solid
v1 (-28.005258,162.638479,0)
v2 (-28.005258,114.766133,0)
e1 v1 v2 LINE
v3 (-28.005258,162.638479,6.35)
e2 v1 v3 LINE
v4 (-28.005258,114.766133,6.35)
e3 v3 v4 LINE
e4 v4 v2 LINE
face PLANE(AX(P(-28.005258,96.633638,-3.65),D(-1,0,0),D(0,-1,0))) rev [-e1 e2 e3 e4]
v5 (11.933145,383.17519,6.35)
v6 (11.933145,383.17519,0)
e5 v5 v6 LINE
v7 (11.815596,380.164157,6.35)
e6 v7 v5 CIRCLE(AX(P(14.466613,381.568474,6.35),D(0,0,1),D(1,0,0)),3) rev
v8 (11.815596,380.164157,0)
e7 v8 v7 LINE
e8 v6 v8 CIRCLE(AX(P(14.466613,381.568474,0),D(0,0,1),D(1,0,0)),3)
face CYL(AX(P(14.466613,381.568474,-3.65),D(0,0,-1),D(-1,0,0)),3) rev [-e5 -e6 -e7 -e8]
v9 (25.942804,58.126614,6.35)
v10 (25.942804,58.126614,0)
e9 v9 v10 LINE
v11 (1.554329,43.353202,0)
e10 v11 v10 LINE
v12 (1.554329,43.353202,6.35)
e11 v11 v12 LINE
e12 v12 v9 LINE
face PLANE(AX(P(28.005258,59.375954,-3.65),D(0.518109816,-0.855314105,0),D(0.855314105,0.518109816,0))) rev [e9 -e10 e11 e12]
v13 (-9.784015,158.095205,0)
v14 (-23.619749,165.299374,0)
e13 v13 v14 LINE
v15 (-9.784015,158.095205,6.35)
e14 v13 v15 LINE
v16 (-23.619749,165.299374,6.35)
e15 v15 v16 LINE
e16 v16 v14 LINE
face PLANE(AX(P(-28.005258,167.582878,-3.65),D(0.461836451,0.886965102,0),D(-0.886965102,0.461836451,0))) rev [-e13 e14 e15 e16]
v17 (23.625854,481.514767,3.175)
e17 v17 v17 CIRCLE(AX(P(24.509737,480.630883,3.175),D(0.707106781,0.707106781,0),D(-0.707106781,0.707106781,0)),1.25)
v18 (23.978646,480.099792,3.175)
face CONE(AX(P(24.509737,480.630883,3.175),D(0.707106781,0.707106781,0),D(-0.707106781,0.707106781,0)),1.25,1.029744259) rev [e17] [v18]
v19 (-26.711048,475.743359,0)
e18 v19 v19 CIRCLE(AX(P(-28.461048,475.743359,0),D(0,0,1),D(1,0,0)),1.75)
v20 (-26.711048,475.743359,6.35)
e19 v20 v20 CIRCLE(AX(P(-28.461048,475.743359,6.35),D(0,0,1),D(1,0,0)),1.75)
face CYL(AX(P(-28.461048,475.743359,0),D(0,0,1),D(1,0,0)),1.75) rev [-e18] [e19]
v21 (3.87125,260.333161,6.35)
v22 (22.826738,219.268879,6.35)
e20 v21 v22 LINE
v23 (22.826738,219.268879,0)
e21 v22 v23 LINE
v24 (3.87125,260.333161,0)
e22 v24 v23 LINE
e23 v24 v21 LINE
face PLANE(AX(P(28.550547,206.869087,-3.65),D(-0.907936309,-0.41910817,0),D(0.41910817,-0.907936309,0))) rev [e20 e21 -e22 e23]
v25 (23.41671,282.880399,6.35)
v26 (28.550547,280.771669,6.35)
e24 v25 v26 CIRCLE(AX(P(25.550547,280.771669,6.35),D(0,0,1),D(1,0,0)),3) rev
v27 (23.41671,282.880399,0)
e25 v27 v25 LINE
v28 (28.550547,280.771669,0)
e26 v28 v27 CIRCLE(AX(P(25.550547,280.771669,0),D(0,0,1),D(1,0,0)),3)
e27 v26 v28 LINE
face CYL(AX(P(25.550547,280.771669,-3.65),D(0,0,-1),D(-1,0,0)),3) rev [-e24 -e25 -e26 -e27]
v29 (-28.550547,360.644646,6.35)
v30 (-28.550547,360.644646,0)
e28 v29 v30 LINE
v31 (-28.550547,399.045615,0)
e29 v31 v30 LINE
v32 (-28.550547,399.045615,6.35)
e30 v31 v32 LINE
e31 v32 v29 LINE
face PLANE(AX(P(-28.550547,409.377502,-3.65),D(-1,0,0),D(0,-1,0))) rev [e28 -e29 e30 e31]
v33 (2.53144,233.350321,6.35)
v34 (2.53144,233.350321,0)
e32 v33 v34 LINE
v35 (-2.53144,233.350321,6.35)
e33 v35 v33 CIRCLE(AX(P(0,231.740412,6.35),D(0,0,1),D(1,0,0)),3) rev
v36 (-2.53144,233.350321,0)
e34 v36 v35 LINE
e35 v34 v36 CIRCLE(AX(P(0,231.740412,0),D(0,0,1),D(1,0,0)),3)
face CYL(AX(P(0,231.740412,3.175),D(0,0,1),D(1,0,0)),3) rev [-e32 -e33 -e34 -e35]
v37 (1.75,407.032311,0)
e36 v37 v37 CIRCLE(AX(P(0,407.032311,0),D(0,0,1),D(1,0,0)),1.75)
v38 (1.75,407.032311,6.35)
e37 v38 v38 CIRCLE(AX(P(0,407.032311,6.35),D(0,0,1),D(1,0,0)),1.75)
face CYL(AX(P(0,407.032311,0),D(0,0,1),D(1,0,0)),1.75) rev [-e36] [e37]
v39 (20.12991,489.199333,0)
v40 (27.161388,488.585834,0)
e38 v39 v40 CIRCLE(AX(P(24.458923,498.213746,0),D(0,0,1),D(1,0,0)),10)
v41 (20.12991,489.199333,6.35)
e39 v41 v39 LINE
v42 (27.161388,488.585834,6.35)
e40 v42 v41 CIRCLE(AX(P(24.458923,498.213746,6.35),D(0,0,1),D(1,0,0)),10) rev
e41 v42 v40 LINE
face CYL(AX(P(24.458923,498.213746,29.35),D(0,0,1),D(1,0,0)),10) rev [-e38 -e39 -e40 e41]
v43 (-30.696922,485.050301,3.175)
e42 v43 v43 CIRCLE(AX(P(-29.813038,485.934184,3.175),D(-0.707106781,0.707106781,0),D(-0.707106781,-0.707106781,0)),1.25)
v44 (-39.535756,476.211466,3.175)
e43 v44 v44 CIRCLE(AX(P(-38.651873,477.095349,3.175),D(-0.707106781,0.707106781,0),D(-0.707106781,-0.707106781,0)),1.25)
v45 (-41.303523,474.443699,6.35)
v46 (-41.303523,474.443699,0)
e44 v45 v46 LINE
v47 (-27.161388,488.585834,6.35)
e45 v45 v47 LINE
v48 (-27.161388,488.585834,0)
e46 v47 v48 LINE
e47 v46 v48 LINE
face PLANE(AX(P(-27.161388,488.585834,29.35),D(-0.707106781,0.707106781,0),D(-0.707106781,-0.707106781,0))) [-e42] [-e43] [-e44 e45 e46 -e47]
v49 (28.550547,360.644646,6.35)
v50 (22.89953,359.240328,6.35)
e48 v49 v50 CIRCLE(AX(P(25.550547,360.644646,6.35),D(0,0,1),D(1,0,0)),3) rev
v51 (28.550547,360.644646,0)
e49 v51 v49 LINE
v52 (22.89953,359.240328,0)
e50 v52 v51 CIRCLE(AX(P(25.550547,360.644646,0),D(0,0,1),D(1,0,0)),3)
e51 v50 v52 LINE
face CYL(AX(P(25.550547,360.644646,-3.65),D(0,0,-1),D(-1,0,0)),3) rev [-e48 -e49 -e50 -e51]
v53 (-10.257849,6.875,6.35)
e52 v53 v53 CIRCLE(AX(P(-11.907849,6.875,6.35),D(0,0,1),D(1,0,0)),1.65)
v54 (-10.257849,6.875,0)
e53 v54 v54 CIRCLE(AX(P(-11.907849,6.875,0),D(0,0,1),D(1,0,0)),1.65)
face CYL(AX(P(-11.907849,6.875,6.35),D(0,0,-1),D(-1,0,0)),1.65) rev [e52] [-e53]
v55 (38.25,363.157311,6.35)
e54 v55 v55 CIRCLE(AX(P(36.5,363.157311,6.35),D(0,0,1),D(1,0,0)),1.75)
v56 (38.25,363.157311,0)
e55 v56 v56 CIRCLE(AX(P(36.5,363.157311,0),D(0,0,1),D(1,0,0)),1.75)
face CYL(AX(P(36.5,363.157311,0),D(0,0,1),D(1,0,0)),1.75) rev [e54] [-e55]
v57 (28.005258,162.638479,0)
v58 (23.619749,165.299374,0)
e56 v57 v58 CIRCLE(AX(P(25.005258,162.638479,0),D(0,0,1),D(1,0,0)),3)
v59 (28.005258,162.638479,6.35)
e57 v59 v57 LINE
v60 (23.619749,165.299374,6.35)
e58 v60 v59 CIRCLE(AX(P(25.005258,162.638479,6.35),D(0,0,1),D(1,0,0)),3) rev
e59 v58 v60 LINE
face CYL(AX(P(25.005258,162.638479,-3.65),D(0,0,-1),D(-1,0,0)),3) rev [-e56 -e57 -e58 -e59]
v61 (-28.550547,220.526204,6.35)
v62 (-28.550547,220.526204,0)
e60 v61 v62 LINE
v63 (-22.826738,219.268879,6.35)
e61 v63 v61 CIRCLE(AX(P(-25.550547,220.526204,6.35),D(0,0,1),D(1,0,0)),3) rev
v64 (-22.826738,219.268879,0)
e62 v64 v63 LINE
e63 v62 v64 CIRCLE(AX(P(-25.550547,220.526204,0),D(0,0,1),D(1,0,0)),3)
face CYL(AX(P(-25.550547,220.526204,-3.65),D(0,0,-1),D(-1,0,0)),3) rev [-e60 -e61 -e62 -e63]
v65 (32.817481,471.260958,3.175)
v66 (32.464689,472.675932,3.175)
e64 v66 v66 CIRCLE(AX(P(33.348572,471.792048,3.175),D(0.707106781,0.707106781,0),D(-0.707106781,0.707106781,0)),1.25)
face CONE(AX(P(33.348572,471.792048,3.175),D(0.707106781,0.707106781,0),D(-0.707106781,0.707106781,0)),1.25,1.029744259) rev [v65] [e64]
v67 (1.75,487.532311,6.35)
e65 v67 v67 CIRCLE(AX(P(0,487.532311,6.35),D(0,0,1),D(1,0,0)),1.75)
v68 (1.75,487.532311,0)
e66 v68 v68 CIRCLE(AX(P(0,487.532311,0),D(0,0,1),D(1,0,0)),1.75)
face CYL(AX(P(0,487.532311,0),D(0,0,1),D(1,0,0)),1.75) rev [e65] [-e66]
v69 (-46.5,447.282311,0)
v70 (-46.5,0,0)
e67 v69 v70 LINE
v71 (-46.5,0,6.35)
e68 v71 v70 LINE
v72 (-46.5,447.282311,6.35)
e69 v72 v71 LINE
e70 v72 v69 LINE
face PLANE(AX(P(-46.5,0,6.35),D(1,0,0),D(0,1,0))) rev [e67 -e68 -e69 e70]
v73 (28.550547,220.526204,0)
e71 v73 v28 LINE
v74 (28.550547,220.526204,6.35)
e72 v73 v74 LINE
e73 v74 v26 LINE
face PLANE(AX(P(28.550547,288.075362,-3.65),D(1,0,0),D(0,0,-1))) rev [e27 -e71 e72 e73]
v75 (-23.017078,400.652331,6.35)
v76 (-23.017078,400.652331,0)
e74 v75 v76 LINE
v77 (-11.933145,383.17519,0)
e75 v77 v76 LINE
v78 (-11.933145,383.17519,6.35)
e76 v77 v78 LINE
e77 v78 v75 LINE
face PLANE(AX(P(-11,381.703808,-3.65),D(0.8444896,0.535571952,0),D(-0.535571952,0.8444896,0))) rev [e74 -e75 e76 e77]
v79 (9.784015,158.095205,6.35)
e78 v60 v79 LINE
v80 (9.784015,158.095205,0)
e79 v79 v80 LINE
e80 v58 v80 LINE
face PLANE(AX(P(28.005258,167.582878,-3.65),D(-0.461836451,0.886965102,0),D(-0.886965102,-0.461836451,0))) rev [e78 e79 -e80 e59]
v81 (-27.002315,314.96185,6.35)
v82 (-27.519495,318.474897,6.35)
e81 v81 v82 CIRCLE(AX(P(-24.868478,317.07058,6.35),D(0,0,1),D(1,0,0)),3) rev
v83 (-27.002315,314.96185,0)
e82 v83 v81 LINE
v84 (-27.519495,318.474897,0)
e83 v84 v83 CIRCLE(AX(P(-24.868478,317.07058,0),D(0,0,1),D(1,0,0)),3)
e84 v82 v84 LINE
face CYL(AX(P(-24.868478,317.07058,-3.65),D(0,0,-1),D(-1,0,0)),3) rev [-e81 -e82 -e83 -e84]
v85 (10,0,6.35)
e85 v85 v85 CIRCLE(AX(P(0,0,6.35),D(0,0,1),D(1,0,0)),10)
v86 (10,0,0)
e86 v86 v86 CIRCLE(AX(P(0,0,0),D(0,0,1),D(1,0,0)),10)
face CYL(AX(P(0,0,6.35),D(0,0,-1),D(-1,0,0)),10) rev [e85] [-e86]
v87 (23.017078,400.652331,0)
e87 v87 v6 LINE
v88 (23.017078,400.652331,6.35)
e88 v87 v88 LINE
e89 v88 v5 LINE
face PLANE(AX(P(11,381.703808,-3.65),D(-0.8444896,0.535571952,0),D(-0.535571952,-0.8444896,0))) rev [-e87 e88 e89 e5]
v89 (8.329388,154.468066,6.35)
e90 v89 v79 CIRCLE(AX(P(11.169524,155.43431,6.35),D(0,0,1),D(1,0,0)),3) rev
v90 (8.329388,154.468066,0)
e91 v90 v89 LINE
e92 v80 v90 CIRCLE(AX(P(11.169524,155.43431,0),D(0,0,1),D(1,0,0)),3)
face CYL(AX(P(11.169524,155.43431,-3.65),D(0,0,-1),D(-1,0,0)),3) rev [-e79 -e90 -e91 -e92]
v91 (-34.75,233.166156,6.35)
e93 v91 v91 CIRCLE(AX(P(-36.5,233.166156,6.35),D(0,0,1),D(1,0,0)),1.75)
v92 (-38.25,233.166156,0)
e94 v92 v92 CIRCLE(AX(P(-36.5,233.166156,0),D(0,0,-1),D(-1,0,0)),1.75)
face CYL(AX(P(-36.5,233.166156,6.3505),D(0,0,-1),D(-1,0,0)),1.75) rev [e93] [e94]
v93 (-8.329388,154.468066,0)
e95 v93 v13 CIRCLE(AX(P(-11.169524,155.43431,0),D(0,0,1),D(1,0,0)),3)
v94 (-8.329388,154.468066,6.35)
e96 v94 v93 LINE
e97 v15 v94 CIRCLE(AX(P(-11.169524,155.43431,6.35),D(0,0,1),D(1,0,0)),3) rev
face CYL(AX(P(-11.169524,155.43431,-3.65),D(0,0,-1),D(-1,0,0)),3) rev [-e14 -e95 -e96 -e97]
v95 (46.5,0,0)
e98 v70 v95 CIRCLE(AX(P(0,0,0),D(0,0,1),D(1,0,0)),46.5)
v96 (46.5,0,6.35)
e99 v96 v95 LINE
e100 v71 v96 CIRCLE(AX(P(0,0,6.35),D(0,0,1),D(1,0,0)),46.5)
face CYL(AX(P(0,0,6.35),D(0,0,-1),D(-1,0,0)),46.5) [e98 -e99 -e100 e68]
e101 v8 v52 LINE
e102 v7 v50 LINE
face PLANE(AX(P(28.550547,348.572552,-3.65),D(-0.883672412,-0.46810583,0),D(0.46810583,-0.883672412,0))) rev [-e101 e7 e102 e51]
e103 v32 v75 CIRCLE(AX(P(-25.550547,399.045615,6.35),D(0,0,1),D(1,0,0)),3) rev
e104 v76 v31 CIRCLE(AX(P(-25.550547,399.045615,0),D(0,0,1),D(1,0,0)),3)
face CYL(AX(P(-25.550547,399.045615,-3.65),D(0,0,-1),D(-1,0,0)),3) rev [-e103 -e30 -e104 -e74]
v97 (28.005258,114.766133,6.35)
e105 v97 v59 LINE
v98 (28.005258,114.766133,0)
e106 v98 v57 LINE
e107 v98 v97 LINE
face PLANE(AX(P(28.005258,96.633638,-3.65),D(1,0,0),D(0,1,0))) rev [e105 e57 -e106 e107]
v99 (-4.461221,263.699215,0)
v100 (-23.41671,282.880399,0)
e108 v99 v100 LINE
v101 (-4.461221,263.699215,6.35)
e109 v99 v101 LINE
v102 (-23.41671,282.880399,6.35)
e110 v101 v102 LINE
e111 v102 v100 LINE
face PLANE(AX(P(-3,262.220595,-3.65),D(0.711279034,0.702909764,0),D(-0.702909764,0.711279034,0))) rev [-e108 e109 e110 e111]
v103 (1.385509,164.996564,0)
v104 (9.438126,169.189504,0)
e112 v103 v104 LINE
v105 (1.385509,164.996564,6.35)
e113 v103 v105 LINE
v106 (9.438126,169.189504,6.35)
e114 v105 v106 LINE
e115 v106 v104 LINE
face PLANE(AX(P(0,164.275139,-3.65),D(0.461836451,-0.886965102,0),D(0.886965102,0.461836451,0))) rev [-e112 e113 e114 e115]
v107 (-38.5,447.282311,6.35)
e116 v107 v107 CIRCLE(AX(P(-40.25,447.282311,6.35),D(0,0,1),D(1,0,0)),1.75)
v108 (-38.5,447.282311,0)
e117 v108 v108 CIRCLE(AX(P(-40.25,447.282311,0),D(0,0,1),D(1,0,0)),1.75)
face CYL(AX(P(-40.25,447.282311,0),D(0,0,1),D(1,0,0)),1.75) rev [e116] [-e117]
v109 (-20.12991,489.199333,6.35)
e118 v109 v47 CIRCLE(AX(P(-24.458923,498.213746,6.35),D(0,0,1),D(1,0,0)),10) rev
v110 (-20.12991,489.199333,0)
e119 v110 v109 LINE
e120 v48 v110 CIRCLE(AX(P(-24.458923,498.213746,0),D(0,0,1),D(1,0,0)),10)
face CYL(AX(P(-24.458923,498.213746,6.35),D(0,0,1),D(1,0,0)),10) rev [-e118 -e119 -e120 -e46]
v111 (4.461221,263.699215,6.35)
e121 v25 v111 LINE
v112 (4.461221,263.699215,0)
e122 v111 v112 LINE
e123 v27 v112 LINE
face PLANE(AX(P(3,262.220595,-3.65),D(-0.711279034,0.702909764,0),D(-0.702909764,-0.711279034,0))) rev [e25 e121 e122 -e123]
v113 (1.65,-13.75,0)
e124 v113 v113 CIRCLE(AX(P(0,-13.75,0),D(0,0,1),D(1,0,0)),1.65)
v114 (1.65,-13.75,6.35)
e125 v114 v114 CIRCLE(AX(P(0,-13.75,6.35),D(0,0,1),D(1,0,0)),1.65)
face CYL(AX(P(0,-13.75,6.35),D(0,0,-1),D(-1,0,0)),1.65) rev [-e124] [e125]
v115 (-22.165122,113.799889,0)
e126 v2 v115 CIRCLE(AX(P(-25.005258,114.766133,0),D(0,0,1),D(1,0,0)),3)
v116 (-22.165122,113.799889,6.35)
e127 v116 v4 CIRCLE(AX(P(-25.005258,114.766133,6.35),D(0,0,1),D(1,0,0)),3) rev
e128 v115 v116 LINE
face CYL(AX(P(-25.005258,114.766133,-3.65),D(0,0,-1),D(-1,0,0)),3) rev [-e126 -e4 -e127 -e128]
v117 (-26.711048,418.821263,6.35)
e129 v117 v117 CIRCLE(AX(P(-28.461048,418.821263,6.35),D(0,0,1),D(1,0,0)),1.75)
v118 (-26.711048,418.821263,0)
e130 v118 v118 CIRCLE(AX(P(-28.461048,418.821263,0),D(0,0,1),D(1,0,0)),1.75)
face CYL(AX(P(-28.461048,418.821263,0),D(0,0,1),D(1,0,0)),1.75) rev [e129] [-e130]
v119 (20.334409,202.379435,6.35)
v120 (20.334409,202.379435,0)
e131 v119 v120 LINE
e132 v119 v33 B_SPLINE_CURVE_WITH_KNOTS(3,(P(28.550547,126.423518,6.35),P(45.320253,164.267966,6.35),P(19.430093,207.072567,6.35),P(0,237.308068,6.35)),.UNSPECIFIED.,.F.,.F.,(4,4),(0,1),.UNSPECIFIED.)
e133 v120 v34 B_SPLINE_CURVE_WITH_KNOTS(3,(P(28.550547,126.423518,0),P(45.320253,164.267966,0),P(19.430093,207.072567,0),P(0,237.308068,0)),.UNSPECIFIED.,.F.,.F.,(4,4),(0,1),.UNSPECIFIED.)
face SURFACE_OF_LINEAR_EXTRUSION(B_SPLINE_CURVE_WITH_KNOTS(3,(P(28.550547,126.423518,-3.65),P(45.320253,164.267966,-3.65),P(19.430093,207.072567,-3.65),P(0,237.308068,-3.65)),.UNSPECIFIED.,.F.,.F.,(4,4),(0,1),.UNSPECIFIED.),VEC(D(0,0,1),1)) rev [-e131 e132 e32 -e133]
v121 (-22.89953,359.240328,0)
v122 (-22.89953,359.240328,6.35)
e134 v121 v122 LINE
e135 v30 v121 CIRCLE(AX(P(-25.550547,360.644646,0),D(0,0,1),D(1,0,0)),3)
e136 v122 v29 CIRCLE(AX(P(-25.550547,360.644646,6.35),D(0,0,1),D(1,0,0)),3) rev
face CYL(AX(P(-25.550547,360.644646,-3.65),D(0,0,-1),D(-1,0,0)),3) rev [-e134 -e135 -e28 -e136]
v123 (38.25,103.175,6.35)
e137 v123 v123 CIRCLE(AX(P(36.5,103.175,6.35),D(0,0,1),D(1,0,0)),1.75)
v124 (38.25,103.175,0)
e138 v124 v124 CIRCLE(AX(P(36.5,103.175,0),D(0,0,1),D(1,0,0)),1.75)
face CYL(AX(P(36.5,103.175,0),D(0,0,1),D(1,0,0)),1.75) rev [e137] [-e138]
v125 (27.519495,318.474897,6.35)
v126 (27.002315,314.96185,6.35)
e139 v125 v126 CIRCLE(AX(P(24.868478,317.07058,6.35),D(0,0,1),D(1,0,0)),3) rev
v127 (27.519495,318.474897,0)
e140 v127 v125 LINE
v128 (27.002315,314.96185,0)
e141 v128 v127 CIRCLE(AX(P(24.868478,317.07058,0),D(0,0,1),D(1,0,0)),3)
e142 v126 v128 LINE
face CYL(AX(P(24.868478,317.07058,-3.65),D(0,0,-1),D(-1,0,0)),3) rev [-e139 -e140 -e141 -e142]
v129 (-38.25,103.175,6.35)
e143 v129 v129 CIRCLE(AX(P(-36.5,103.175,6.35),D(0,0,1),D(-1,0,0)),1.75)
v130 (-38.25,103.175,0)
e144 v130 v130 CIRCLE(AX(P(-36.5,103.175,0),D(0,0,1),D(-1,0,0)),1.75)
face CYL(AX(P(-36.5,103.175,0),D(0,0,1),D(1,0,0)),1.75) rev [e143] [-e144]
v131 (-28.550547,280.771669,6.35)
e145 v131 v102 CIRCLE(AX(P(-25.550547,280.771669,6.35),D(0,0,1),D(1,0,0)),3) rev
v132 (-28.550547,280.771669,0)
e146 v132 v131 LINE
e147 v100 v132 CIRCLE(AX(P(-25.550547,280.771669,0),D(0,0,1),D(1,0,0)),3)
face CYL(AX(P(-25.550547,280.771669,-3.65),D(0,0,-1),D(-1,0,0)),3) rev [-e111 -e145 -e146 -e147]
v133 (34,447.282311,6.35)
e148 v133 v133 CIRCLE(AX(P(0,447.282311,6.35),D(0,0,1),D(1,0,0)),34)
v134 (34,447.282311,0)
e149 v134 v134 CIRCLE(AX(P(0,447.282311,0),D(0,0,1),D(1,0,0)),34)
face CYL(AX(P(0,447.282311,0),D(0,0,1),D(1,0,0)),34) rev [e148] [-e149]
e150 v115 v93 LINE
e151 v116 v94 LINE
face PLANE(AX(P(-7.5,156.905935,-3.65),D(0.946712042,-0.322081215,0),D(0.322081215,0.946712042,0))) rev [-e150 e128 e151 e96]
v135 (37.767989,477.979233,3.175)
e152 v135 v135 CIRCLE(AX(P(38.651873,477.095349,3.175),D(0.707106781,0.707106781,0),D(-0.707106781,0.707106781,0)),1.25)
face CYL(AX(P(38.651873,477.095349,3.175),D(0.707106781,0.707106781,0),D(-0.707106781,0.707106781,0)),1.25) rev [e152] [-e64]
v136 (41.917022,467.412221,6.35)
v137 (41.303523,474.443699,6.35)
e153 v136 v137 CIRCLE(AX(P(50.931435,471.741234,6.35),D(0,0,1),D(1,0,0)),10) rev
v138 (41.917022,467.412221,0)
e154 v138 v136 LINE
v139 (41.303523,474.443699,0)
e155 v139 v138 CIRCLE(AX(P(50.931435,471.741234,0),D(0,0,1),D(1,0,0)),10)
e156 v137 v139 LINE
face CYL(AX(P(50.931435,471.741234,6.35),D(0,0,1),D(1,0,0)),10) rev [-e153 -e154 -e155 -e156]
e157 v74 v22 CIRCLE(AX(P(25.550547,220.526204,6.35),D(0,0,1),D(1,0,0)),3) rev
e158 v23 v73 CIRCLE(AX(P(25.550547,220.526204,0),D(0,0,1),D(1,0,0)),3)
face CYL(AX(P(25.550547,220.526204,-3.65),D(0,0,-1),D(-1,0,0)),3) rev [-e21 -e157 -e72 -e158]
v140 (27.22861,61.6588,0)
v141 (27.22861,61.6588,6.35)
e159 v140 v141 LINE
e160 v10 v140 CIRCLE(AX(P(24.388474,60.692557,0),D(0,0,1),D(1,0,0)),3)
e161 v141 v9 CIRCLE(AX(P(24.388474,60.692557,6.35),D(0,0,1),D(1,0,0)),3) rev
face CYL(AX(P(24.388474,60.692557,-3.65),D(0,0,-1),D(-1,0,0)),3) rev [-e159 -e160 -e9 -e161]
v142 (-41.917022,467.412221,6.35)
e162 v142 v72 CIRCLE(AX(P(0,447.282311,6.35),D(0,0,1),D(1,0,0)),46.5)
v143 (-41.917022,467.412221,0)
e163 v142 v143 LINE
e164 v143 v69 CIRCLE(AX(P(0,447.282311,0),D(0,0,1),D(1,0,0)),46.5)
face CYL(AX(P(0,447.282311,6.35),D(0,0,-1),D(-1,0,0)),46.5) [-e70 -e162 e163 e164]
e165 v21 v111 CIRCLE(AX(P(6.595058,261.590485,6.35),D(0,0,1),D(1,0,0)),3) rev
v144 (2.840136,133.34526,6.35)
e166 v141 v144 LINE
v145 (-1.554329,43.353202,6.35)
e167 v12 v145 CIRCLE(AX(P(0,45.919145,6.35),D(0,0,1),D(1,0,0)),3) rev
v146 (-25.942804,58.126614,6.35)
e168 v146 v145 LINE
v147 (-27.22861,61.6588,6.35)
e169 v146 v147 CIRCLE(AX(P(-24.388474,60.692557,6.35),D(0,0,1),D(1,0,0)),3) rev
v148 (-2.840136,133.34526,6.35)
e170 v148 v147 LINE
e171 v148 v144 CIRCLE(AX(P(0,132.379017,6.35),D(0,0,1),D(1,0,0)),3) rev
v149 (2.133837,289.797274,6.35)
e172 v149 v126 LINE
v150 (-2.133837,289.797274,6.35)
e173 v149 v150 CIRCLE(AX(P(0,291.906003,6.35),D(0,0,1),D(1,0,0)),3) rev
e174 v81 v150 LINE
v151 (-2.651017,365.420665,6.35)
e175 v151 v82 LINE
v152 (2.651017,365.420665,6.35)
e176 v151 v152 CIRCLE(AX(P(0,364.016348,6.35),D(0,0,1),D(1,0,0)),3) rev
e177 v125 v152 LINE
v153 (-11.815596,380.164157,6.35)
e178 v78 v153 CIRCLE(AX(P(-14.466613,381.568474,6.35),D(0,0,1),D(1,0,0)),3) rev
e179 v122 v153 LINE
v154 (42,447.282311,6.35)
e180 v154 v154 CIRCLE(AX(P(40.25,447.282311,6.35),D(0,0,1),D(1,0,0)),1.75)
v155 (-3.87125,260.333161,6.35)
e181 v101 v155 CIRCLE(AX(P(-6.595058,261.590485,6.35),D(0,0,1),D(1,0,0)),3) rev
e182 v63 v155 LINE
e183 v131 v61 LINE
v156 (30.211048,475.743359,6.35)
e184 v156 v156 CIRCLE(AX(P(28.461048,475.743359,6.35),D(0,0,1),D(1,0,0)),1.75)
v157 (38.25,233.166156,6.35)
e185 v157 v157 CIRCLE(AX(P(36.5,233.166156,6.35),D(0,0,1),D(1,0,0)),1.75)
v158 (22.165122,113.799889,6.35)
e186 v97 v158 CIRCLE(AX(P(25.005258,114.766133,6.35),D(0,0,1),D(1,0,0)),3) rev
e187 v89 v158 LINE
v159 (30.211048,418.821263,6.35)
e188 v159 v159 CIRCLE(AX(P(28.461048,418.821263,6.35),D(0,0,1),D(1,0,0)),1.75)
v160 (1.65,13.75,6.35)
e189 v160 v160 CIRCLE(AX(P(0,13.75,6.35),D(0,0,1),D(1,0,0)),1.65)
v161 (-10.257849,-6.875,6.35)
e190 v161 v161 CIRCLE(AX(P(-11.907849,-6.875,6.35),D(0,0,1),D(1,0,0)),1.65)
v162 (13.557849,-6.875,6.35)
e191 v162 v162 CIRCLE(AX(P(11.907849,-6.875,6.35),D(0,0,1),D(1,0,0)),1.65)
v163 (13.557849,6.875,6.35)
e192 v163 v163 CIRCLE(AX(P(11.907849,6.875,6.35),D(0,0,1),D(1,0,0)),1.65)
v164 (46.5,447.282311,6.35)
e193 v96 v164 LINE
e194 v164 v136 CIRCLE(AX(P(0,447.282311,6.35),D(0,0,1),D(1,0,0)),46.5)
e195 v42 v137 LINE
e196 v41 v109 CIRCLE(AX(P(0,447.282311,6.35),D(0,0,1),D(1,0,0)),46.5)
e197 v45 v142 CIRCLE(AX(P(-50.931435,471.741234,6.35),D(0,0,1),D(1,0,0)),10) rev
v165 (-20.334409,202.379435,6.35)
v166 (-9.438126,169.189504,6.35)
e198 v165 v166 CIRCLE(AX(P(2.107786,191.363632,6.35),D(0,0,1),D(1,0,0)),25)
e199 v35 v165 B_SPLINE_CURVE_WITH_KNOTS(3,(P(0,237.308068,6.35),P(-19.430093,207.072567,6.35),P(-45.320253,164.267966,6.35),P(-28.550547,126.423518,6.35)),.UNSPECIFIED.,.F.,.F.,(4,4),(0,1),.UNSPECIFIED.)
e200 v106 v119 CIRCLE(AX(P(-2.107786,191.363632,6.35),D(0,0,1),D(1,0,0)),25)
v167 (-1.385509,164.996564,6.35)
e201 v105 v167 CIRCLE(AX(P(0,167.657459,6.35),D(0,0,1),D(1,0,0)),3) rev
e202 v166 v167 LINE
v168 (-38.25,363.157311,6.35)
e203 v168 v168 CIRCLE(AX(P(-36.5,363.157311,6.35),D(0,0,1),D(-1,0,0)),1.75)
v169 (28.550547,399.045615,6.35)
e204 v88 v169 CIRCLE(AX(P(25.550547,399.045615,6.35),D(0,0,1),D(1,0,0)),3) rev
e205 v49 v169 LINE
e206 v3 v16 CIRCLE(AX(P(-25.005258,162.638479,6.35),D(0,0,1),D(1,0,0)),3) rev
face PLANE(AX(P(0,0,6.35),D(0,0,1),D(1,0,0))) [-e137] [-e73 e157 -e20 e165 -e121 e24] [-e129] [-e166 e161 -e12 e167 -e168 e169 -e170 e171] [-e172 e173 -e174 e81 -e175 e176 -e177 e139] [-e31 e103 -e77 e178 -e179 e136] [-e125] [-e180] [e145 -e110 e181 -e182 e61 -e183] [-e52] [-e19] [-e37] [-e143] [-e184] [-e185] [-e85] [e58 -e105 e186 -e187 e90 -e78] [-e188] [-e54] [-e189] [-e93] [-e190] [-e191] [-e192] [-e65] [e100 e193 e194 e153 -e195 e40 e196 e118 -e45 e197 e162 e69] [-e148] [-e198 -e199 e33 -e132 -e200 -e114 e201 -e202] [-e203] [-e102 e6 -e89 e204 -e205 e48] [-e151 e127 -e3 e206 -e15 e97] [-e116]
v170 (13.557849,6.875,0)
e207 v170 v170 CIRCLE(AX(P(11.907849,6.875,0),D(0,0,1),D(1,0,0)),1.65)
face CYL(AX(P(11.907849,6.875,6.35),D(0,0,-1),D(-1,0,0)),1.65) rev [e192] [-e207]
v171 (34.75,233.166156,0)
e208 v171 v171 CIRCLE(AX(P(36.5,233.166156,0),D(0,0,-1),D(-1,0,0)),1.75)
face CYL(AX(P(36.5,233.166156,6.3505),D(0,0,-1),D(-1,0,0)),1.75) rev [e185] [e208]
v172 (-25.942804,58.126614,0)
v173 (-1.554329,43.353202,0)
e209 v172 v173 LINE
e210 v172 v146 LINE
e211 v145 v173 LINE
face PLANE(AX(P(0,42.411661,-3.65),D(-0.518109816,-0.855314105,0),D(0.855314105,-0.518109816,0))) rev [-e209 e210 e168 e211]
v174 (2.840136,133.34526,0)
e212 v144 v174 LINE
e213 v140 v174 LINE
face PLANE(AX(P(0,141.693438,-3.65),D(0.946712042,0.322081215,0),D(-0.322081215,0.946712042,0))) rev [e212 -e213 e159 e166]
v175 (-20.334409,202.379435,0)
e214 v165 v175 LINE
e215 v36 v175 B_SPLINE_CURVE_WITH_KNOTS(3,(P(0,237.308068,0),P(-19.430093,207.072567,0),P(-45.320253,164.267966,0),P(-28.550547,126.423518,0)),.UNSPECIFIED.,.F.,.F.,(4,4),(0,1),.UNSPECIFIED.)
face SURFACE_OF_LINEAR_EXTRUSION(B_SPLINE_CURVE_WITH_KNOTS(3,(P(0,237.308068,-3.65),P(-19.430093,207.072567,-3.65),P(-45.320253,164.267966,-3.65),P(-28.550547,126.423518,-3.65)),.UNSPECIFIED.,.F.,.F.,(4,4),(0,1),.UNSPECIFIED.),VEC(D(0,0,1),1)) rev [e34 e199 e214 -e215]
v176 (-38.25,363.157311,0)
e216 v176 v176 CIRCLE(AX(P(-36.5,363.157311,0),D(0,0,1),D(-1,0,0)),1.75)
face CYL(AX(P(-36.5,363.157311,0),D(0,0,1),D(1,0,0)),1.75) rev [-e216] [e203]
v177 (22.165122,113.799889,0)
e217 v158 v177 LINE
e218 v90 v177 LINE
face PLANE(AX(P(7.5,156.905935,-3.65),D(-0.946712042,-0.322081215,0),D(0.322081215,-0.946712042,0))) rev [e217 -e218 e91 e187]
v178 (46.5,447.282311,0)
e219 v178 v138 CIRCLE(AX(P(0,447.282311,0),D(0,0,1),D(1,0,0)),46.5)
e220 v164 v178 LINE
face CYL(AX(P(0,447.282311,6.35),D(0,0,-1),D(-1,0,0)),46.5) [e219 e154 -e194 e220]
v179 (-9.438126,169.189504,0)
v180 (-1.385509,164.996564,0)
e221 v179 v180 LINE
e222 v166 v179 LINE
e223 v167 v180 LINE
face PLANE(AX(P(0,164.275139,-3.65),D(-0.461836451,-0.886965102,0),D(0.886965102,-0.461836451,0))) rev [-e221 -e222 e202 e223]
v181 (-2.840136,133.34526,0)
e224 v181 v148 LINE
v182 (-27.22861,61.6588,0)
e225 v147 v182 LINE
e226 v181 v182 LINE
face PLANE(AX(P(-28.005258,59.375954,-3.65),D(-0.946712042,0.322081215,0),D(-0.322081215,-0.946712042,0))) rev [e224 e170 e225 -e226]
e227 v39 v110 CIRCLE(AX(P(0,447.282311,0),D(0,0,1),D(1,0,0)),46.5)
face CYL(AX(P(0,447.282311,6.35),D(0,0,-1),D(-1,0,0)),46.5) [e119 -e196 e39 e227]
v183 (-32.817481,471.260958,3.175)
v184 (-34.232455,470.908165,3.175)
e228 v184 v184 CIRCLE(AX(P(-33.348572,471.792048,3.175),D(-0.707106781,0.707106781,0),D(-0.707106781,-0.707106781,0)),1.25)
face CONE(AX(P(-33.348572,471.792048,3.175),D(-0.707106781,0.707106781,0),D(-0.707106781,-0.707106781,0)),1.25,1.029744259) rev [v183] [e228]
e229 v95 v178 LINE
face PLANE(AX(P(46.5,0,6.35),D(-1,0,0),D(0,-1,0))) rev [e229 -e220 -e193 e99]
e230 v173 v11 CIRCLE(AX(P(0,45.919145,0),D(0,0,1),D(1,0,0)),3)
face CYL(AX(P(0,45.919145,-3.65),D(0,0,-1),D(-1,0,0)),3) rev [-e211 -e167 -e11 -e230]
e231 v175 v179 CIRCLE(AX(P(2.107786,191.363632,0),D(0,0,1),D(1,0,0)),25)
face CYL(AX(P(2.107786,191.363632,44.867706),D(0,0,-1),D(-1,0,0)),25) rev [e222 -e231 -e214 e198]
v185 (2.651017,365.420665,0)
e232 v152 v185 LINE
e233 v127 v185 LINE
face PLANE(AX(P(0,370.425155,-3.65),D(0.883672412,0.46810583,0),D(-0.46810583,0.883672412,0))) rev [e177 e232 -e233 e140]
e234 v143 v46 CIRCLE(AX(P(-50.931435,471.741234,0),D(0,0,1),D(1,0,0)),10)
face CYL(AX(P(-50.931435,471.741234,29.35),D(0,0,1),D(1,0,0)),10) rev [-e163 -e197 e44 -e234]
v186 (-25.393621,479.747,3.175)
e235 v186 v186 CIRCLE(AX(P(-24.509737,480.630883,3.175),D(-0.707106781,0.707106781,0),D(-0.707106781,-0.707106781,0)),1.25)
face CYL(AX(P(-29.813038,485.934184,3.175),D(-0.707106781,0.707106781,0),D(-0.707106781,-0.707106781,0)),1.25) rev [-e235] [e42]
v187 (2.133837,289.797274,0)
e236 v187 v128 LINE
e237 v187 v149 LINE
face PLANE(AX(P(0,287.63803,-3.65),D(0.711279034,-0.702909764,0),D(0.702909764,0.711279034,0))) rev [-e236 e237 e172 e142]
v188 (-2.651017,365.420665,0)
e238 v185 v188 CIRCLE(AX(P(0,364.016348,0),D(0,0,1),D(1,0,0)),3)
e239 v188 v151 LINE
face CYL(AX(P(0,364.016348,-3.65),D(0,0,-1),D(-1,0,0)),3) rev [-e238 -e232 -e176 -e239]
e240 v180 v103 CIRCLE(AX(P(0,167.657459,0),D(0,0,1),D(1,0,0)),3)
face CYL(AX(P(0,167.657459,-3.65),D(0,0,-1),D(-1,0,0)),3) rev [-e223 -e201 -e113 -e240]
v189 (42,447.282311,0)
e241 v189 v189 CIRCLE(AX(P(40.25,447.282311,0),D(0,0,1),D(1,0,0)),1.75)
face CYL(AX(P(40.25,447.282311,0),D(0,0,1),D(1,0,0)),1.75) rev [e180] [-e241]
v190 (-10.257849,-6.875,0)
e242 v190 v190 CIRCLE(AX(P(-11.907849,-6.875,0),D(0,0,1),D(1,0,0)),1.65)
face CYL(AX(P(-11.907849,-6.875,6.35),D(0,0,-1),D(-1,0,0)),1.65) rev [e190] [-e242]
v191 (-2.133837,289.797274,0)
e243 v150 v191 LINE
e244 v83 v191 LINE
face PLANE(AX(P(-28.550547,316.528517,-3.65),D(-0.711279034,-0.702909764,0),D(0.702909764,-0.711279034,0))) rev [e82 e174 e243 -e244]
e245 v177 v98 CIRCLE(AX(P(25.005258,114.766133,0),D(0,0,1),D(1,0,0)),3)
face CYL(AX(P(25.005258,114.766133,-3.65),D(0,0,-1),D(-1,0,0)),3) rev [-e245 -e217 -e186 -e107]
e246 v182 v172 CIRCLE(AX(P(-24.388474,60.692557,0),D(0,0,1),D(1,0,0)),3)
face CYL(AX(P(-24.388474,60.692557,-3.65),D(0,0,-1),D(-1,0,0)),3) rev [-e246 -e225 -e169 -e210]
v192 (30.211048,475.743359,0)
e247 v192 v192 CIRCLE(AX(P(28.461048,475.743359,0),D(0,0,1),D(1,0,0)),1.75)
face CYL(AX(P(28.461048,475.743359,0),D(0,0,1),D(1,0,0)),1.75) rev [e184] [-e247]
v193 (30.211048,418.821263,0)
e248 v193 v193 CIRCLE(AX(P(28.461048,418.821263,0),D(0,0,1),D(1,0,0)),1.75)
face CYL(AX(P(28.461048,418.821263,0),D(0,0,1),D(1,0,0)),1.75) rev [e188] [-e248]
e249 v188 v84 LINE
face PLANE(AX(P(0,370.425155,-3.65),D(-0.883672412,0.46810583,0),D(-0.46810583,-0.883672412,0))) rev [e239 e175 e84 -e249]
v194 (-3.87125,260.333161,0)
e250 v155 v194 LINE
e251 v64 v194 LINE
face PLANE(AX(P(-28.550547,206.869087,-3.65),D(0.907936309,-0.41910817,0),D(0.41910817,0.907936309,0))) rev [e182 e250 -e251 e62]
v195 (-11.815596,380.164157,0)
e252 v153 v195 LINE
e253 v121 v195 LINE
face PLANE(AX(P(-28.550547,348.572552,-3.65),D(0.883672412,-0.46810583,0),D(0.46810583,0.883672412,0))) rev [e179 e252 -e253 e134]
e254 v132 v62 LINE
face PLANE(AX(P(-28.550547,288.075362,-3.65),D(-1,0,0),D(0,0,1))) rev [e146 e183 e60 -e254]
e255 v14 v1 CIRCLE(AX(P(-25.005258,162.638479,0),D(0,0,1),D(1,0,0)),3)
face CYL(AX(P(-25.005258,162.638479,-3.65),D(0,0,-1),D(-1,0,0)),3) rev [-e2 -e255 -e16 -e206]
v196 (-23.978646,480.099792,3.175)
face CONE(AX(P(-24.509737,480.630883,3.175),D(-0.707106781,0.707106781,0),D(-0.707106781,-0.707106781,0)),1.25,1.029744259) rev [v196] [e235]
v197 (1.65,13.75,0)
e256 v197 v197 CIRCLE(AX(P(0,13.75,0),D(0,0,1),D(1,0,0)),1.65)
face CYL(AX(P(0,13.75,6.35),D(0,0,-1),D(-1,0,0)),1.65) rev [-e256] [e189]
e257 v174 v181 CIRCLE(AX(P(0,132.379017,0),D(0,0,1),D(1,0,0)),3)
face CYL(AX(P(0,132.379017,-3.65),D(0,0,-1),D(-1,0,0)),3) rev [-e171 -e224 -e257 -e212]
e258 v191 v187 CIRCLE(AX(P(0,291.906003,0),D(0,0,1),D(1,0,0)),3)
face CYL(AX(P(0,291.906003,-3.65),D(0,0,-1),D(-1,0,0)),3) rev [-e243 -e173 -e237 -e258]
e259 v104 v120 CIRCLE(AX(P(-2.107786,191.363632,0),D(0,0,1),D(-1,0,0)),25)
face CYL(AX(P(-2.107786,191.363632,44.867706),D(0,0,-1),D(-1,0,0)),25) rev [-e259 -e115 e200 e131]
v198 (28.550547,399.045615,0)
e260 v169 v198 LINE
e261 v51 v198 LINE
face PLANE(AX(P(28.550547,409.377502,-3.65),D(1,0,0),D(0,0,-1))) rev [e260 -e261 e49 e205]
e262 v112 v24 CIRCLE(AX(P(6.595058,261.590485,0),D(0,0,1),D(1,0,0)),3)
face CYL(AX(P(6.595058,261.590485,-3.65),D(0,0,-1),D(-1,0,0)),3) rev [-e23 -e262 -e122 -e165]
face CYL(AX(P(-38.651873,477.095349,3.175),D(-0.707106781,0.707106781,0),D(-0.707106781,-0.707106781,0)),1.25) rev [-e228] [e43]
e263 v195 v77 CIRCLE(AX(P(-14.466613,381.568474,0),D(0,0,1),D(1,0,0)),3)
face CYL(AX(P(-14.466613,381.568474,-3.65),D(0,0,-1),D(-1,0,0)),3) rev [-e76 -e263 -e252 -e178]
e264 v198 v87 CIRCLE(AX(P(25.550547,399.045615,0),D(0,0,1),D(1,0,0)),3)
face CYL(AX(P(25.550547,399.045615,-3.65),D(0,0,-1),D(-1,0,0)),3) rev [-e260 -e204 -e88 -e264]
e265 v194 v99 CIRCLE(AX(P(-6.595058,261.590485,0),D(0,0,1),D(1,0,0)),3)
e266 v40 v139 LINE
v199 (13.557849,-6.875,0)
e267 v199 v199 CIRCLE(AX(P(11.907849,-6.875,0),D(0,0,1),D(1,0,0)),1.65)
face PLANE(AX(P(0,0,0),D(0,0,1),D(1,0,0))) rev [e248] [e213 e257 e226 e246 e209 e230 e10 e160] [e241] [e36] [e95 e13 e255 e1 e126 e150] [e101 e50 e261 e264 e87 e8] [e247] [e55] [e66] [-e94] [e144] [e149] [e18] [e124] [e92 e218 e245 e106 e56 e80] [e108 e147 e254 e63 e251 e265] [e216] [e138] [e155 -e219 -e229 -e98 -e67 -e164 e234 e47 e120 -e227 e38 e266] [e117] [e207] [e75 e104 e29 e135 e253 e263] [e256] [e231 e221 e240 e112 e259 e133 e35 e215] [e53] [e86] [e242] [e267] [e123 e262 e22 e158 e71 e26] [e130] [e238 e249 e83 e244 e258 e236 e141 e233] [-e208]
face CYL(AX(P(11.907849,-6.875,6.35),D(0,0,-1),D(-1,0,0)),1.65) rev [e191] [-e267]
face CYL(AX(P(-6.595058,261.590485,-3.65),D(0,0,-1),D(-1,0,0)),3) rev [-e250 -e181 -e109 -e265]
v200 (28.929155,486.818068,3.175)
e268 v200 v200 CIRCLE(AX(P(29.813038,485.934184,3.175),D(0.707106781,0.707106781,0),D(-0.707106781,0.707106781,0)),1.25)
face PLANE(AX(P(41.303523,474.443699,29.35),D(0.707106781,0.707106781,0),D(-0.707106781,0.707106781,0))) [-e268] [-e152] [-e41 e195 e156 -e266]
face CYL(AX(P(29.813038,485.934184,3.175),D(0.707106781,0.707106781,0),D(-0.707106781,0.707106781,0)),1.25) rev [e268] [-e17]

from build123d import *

# Parameters (mm, degrees)
SKETCH2_R                            = 10
SKETCH2_R_2                          = 1.65
BOSS_EXTRUDE1_DEPTH                  = 6.35
CUT_EXTRUDE1_DEPTH                   = 10
FILLET3_R                            = 3
SKETCH5_R                            = 1.75
CUT_EXTRUDE2_DEPTH                   = 549.511460792
SKETCH6_R                            = 26.5
CUT_EXTRUDE3_DEPTH                   = 10
BOSS_EXTRUDE2_START                  = -6.35
BOSS_EXTRUDE2_DEPTH                  = 6.35
TAP_DRILL_FOR_M3X0_5_TAP1_AT_2_COUNT = 2
TAP_DRILL_FOR_M3X0_5_TAP1_AT_2_PITCH = 12
CIRPATTERN2_COUNT                    = 2
CIRPATTERN2_ANGLE                    = 90
CUT_EXTRUDE4_DEPTH                   = 549.511460792
SKETCH11_R                           = 34
CUT_EXTRUDE5_DEPTH                   = 549.511460792
CUT_EXTRUDE6_DEPTH                   = 549.511460792
CUT_EXTRUDE6_DEPTH_BACK              = 549.511460792
SKETCH12_R                           = 1.75
SKETCH13_W                           = 93
SKETCH13_H                           = 53.952458561
CUT_EXTRUDE7_DEPTH                   = 549.511460792
BOSS_EXTRUDE3_REACH                  = 319.131
SKETCH14_W                           = 17.515975695
SKETCH14_H                           = 6.35
BOSS_EXTRUDE4_DEPTH                  = 6.35
SKETCH16_R                           = 1.75
CUT_EXTRUDE8_DEPTH                   = 497.007604239
SKETCH17_R                           = 1.75
BOSS_EXTRUDE5_DEPTH                  = 6.35
BOSS_EXTRUDE6_DEPTH                  = 6.35
M3X0_5_TAPPED_HOLE1_AT_2_COUNT       = 2
M3X0_5_TAPPED_HOLE1_AT_2_PITCH       = 12.5
CIRPATTERN3_COUNT                    = 2
CIRPATTERN3_ANGLE                    = 90
FILLET4_R                            = 10


with BuildPart() as part:
    # Sketch2 → Boss-Extrude1 (new body)
    with BuildSketch(Plane.XY):
        with BuildLine():
            Line((-46.5, 0), (-46.5, 500))
            ThreePointArc((-46.5, 500), (0, 546.5), (46.5, 500))
            Line((46.5, 500), (46.5, 0))
            ThreePointArc((46.5, 0), (0, -46.5), (-46.5, 0))
        make_face()
        Circle(SKETCH2_R, mode=Mode.SUBTRACT)
        with Locations((0, 13.75)):
            Circle(SKETCH2_R_2, mode=Mode.SUBTRACT)
        with Locations((11.907849302, 6.875)):
            Circle(SKETCH2_R_2, mode=Mode.SUBTRACT)
        with Locations((11.907849302, -6.875)):
            Circle(SKETCH2_R_2, mode=Mode.SUBTRACT)
        with Locations((0, -13.75)):
            Circle(SKETCH2_R_2, mode=Mode.SUBTRACT)
        with Locations((-11.907849302, -6.875)):
            Circle(SKETCH2_R_2, mode=Mode.SUBTRACT)
        with Locations((-11.907849302, 6.875)):
            Circle(SKETCH2_R_2, mode=Mode.SUBTRACT)
    extrude(amount=BOSS_EXTRUDE1_DEPTH)

    # Sketch4 → Cut-Extrude1 (cut)
    with BuildSketch(Plane.XY.offset(6.35)):
        Polygon((28.005258112, 59.37595418), (0, 42.411661153), (-28.005258112, 59.37595418), (0, 141.693437584), align=None)
        Polygon((-7.5, 156.905935087), (-28.005258112, 96.633637735), (-28.005258112, 167.582877854), align=None)
        Polygon((28.005258112, 167.582877854), (7.5, 156.905935087), (28.005258112, 96.633637735), align=None)
        with BuildLine():
            Line((0, 164.275138905), (28.550546746, 179.141206521))
            add(Edge.make_bspline(
                [(28.550546746, 179.141206521), (45.32025339, 216.985654627), (19.430092874, 259.790255689), (0, 290.025756679)],
                knots=[0, 0, 0, 0, 1, 1, 1, 1], degree=3))
            add(Edge.make_bspline(
                [(-28.550546746, 179.141206521), (-45.32025339, 216.985654627), (-19.430092874, 259.790255689), (0, 290.025756679)],
                knots=[0, 0, 0, 0, 1, 1, 1, 1], degree=3))
            Line((-28.550546746, 179.141206521), (0, 164.275138905))
        make_face()
        Polygon((28.550546746, 259.58677623), (3, 314.938284003), (28.550546746, 340.793051053), align=None)
        Polygon((-3, 314.938284003), (-28.550546746, 340.793051053), (-28.550546746, 259.58677623), align=None)
        Polygon((0, 423.142843498), (-28.550546746, 369.246205395), (0, 340.355718526), (28.550546746, 369.246205395), align=None)
        Polygon((-28.550546746, 462.095190817), (-28.550546746, 401.290241252), (-11, 434.421497018), align=None)
        Polygon((28.550546746, 401.290241252), (11, 434.421497018), (28.550546746, 462.095190817), align=None)
    extrude(amount=-CUT_EXTRUDE1_DEPTH, mode=Mode.SUBTRACT)

    # Fillet3
    fillet3_edges = [part.edges().sort_by_distance(p)[0] for p in [
        (-11, 434.421497018, 3.175),
        (-28.550546746, 401.290241252, 3.175),
        (28.550546746, 401.290241252, 3.175),
        (11, 434.421497018, 3.175),
        (28.550546746, 462.095190817, 3.175),
        (-28.550546746, 462.095190817, 3.175),
        (0, 423.142843498, 3.175),
        (-28.550546746, 369.246205395, 3.175),
        (28.550546746, 369.246205395, 3.175),
        (0, 340.355718526, 3.175),
        (28.550546746, 340.793051053, 3.175),
        (-28.550546746, 340.793051053, 3.175),
        (-3, 314.938284003, 3.175),
        (3, 314.938284003, 3.175),
        (28.550546746, 259.58677623, 3.175),
        (-28.550546746, 259.58677623, 3.175),
        (28.550546746, 179.141206521, 3.175),
        (0, 290.025756679, 3.175),
        (-28.550546746, 179.141206521, 3.175),
        (0, 164.275138905, 3.175),
        (-28.005258112, 96.633637735, 3.175),
        (28.005258112, 96.633637735, 3.175),
        (7.5, 156.905935087, 3.175),
        (-28.005258112, 167.582877854, 3.175),
        (28.005258112, 167.582877854, 3.175),
        (0, 141.693437584, 3.175),
        (28.005258112, 59.37595418, 3.175),
        (-28.005258112, 59.37595418, 3.175),
        (0, 42.411661153, 3.175),
        (-7.5, 156.905935087, 3.175),
    ]]
    fillet(fillet3_edges, radius=FILLET3_R)

    # Sketch5 → Cut-Extrude2 (cut, through all)
    with BuildSketch(Plane.XY.offset(6.35)):
        with Locations((36.5, 103.175)):
            Circle(SKETCH5_R)
        with Locations(Location((-36.5, 103.175, 0), (0, 0, 180))):
            Circle(SKETCH5_R)
        with Locations(Location((36.5, 259.525, 0), (0, 0, 180))):
            Circle(SKETCH5_R)
        with Locations((-36.5, 259.525)):
            Circle(SKETCH5_R)
        with Locations((36.5, 415.875)):
            Circle(SKETCH5_R)
        with Locations(Location((-36.5, 415.875, 0), (0, 0, 180))):
            Circle(SKETCH5_R)
    extrude(amount=-CUT_EXTRUDE2_DEPTH, mode=Mode.SUBTRACT)

    # Sketch6 → Cut-Extrude3 (cut)
    with BuildSketch(Plane.XY.offset(6.35)):
        with Locations((0, 500)):
            Circle(SKETCH6_R)
    extrude(amount=-CUT_EXTRUDE3_DEPTH, mode=Mode.SUBTRACT)

    # Sketch7 → Boss-Extrude2 (add)
    with BuildSketch(Plane.XY.offset(6.35).offset(BOSS_EXTRUDE2_START)):
        with BuildLine():
            Line((44.110383395, 529.968247771), (29.968247771, 544.110383395))
            ThreePointArc((29.968247771, 544.110383395), (23.286397782, 542.399293624), (16.474718596, 543.483717035))
            ThreePointArc((16.474718596, 543.483717035), (32.880465325, 532.880465325), (43.483717035, 516.474718596))
            ThreePointArc((43.483717035, 516.474718596), (42.399293624, 523.286397782), (44.110383395, 529.968247771))
        make_face()
    boss_extrude2 = extrude(amount=BOSS_EXTRUDE2_DEPTH)

    # Sketch9 → Tap Drill for M3x0.5 Tap1 (revolve, cut)
    with BuildSketch(Plane(origin=(32.796674896, 541.28195627, 3.175), x_dir=(-0.7071067811865481, 0.7071067811865469, 0), z_dir=(0, 0, 1))):
        Polygon((0, 0), (0, 5.751075774), (1.25, 5), (1.25, 0), align=None)
    tap_drill_for_m3x0_5_tap1 = revolve(axis=Axis((37.286802956, 545.772084331, 3.175), (-0.7071067811865468, -0.7071067811865482, 0)), mode=Mode.SUBTRACT)

    # Tap Drill for M3x0.5 Tap1 at 2: Tap Drill for M3x0.5 Tap1 ×2
    with Locations(*[Vector(0.7071067811865482, -0.7071067811865468, 0) * (i * TAP_DRILL_FOR_M3X0_5_TAP1_AT_2_PITCH) for i in range(1, TAP_DRILL_FOR_M3X0_5_TAP1_AT_2_COUNT)]):
        add(tap_drill_for_m3x0_5_tap1, mode=Mode.SUBTRACT)

    # CirPattern2: Boss-Extrude2, Tap Drill for M3x0.5 Tap1 ×2 about axis
    cirpattern2_axis = Axis((0, 500, 0), (0, 0, 1))
    add([boss_extrude2.rotate(cirpattern2_axis, i * CIRPATTERN2_ANGLE / (CIRPATTERN2_COUNT - 1)) for i in range(1, CIRPATTERN2_COUNT)])
    add([tap_drill_for_m3x0_5_tap1.rotate(cirpattern2_axis, i * CIRPATTERN2_ANGLE / (CIRPATTERN2_COUNT - 1)) for i in range(1, CIRPATTERN2_COUNT)], mode=Mode.SUBTRACT)

    # CirPattern2 copy 1 sketch → CirPattern2 copy 1 (revolve, cut)
    with BuildSketch(Plane(origin=(-32.796674896, 541.28195627, 3.175), x_dir=(-0.7071067811865445, -0.7071067811865506, 0), z_dir=(0, 0, 1))):
        Polygon((0, 0), (0, 5.751075774), (1.25, 5), (1.25, 0), align=None)
    revolve(axis=Axis((-37.286802956, 545.772084331, 3.175), (0.7071067811865507, -0.7071067811865444, 0)), mode=Mode.SUBTRACT)

    # Sketch10 → Cut-Extrude4 (cut, through all)
    with BuildSketch(Plane.XY.offset(6.35)):
        with BuildLine():
            Line((-43.483717035, 516.474718596), (-63.483717035, 516.474718596))
            ThreePointArc((-63.483717035, 516.474718596), (0, 565.586573942), (63.483717035, 516.474718596))
            Line((63.483717035, 516.474718596), (43.483717035, 516.474718596))
            ThreePointArc((43.483717035, 516.474718596), (0, 546.5), (-43.483717035, 516.474718596))
        make_face()
    extrude(amount=-CUT_EXTRUDE4_DEPTH, mode=Mode.SUBTRACT)

    # Sketch11 → Cut-Extrude5 (cut, through all)
    with BuildSketch(Plane.XY.offset(6.35)):
        with Locations((0, 500)):
            Circle(SKETCH11_R)
    extrude(amount=-CUT_EXTRUDE5_DEPTH, mode=Mode.SUBTRACT)

    # Sketch12 → Cut-Extrude6 (cut, two sides: drawn at the far end of the back side and taken through both)
    with BuildSketch(Plane.XY.offset(6.35).offset(-CUT_EXTRUDE6_DEPTH_BACK)):
        with Locations((0, 540.25)):
            Circle(SKETCH12_R)
        with Locations((28.461047943, 528.461047943)):
            Circle(SKETCH12_R)
        with Locations((40.25, 500)):
            Circle(SKETCH12_R)
        with Locations((28.461047943, 471.538952057)):
            Circle(SKETCH12_R)
        with Locations((0, 459.75)):
            Circle(SKETCH12_R)
        with Locations((-28.461047943, 471.538952057)):
            Circle(SKETCH12_R)
        with Locations((-40.25, 500)):
            Circle(SKETCH12_R)
        with Locations((-28.461047943, 528.461047943)):
            Circle(SKETCH12_R)
    extrude(amount=CUT_EXTRUDE6_DEPTH + CUT_EXTRUDE6_DEPTH_BACK, mode=Mode.SUBTRACT)

    # Sketch13 → Cut-Extrude7 (cut, through all)
    with BuildSketch(Plane(origin=(0, 0, 0), x_dir=(-1, 0, 0), z_dir=(0, 0, -1))):
        with Locations((0, 207.119171895)):
            Rectangle(SKETCH13_W, SKETCH13_H)
    extrude(amount=-CUT_EXTRUDE7_DEPTH, mode=Mode.SUBTRACT)


with BuildPart() as cut_extrude7_piece_1:
    # of the separate pieces the step leaves, piece 1, a body of its own (cut_extrude7_pieces)
    add(part.part.solids().sort_by_distance((46.5, 500, 0))[0])


with BuildPart() as cut_extrude7_piece_2:
    # of the separate pieces the step leaves, piece 2, a body of its own (cut_extrude7_pieces)
    add(part.part.solids().sort_by_distance((46.5, 180.142942614, 0))[0])


with BuildPart() as cut_extrude7_piece_1_1:
    # Body-Move/Copy1: moved
    add(cut_extrude7_piece_1.part.moved(Location((0, -52.7176888, 0))))

    # Boss-Extrude3: up to this face of the body (flat: up to its plane)
    boss_extrude3_end = Plane(cut_extrude7_piece_1_1.part.faces().sort_by_distance((37.742012152, 181.377712375, 3.175))[0])
    # Sketch14 → Boss-Extrude3 (add, up to the picked face)
    with BuildSketch(Plane(origin=(0, 180.142942614, 0), x_dir=(1, 0, 0), z_dir=(0, 1, 0)), mode=Mode.PRIVATE) as boss_extrude3_sk1:
        with Locations((-37.742012153, -3.175)):
            Rectangle(SKETCH14_W, SKETCH14_H)
    boss_extrude3_tool1 = split(extrude(boss_extrude3_sk1.sketch, amount=BOSS_EXTRUDE3_REACH, mode=Mode.PRIVATE), bisect_by=boss_extrude3_end, keep=Keep.BOTH, mode=Mode.PRIVATE)
    # Sketch14 → Boss-Extrude3 (add, up to the picked face)
    with BuildSketch(Plane(origin=(0, 180.142942614, 0), x_dir=(1, 0, 0), z_dir=(0, 1, 0)), mode=Mode.PRIVATE) as boss_extrude3_sk2:
        with Locations((37.742012153, -3.175)):
            Rectangle(SKETCH14_W, SKETCH14_H)
    boss_extrude3_tool2 = split(extrude(boss_extrude3_sk2.sketch, amount=BOSS_EXTRUDE3_REACH, mode=Mode.PRIVATE), bisect_by=boss_extrude3_end, keep=Keep.BOTH, mode=Mode.PRIVATE)

    add(cut_extrude7_piece_2.part)  # Boss-Extrude3 merges Cut-Extrude7 piece 2
    add(boss_extrude3_tool1.solids().sort_by(Axis((-37.742012, 180.142943, 3.175), (0, 1, 0)))[0])
    add(boss_extrude3_tool2.solids().sort_by(Axis((37.742012, 180.142943, 3.175), (0, 1, 0)))[0])

    # Sketch15 → Boss-Extrude4 (add)
    with BuildSketch(Plane(origin=(0, 0, 0), x_dir=(-1, 0, 0), z_dir=(0, 0, -1))):
        with BuildLine():
            Line((28.984024305, 181.377712375), (28.984024305, 180.142942614))
            ThreePointArc((28.984024305, 180.142942614), (28.425309599, 179.275911344), (27.605954054, 178.649363792))
            Line((27.605954054, 178.649363792), (9.43812576, 169.189504186))
            ThreePointArc((9.43812576, 169.189504186), (21.644913421, 183.565600372), (20.334408511, 202.379435266))
            add(Edge.make_bspline(
                [(28.984024305, 181.377712375), (26.665870811, 188.528361062), (23.678798122, 195.56600215), (20.334408511, 202.379435266)],
                knots=[0.471090389, 0.471090389, 0.471090389, 0.471090389, 0.656207947, 0.656207947, 0.656207947, 0.656207947], degree=3))
        make_face()
        with BuildLine():
            Line((-9.43812576, 169.189504186), (-27.605954054, 178.649363792))
            ThreePointArc((-27.605954054, 178.649363792), (-28.425309599, 179.275911344), (-28.984024305, 180.142942614))
            Line((-28.984024305, 180.142942614), (-28.984024304, 181.377712375))
            add(Edge.make_bspline(
                [(-28.984024304, 181.377712375), (-26.665870811, 188.528361062), (-23.678798122, 195.56600215), (-20.334408511, 202.379435266)],
                knots=[0.471090389, 0.471090389, 0.471090389, 0.471090389, 0.656207947, 0.656207947, 0.656207947, 0.656207947], degree=3))
            ThreePointArc((-20.334408511, 202.379435266), (-21.644913421, 183.565600372), (-9.43812576, 169.189504186))
        make_face()
    extrude(amount=-BOSS_EXTRUDE4_DEPTH)

    # Sketch16 → Cut-Extrude8 (cut, through all)
    with BuildSketch(Plane(origin=(0, 0, 0), x_dir=(-1, 0, 0), z_dir=(0, 0, -1))):
        with Locations((36.5, 233.1661556)):
            Circle(SKETCH16_R)
        with Locations((-36.5, 233.1661556)):
            Circle(SKETCH16_R)
    extrude(amount=-CUT_EXTRUDE8_DEPTH, mode=Mode.SUBTRACT)

    # Sketch17 → Boss-Extrude5 (add)
    with BuildSketch(Plane(origin=(0, 0, 0), x_dir=(-1, 0, 0), z_dir=(0, 0, -1))):
        with Locations((36.5, 206.8073112)):
            Circle(SKETCH17_R)
        with Locations((-36.5, 206.8073112)):
            Circle(SKETCH17_R)
    extrude(amount=-BOSS_EXTRUDE5_DEPTH)

    # Sketch18 → Boss-Extrude6 (add)
    with BuildSketch(Plane(origin=(0, 0, 0), x_dir=(-1, 0, 0), z_dir=(0, 0, -1))):
        Polygon((25.040067328, 486.464514152), (27.161387672, 488.585834496), (41.303523296, 474.443698872), (39.182202952, 472.322378528), align=None)
        Polygon((-39.182202952, 472.322378528), (-41.303523296, 474.443698872), (-27.161387672, 488.585834496), (-25.040067328, 486.464514152), align=None)
    extrude(amount=-BOSS_EXTRUDE6_DEPTH)

    # Sketch21 → M3x0.5 Tapped Hole1 (revolve, cut)
    with BuildSketch(Plane(origin=(-29.813038101, 485.934184066, 3.175), x_dir=(-0.707106781186547, -0.7071067811865481, 0), z_dir=(0, 0, 1))):
        Polygon((0, 0), (0, 8.251075774), (1.25, 7.5), (1.25, 0), align=None)
    m3x0_5_tapped_hole1 = revolve(axis=Axis((-34.303166162, 490.424312127, 3.175), (0.7071067811865481, -0.7071067811865469, 0)), mode=Mode.SUBTRACT)

    # M3x0.5 Tapped Hole1 at 2: M3x0.5 Tapped Hole1 ×2
    with Locations(*[Vector(-0.7071067811865469, -0.7071067811865481, 0) * (i * M3X0_5_TAPPED_HOLE1_AT_2_PITCH) for i in range(1, M3X0_5_TAPPED_HOLE1_AT_2_COUNT)]):
        add(m3x0_5_tapped_hole1, mode=Mode.SUBTRACT)

    # CirPattern3: M3x0.5 Tapped Hole1 ×2 about axis
    cirpattern3_axis = Axis((0, 447.2823112, 0), (0, 0, -1))
    for i in range(1, CIRPATTERN3_COUNT):
        add(m3x0_5_tapped_hole1.rotate(cirpattern3_axis, i * CIRPATTERN3_ANGLE / (CIRPATTERN3_COUNT - 1)), mode=Mode.SUBTRACT)

    # CirPattern3 copy 1 sketch → CirPattern3 copy 1 (revolve, cut)
    with BuildSketch(Plane(origin=(29.813038101, 485.934184066, 3.175), x_dir=(-0.7071067811865457, 0.7071067811865495, 0), z_dir=(0, 0, 1))):
        Polygon((0, 0), (0, 8.251075774), (1.25, 7.5), (1.25, 0), align=None)
    revolve(axis=Axis((34.303166162, 490.424312127, 3.175), (-0.7071067811865493, -0.7071067811865457, 0)), mode=Mode.SUBTRACT)

    # Fillet4
    # the kernel refuses this fillet: 10 mm, written as the material it adds along each edge
    with BuildSketch(Plane(origin=(-25.040067328, 486.464514152, 0), x_dir=(-0.7071067811865487, 0.7071067811865464, 0), z_dir=(0, 0, 1)), Plane(origin=(39.182202952, 472.322378528, 0), x_dir=(0.7071067811865666, 0.7071067811865286, 0), z_dir=(0, 0, 1))) as fillet4_piece_1:
        with BuildLine():
            CenterArc((7.897030706, -8.71889272), FILLET4_R, 119.321067137, 41.330757835)
            Line((-1.538196466, -5.405814363), (-1.72690101, -5.339552795))
            ThreePointArc((-1.72690101, -5.339552795), (-0.879713349, -2.671432223), (-0.195320442, 0.043010753))
            Line((-0.195320442, 0.043010753), (0, 0.2))
            ThreePointArc((0, 0.2), (1.5, 0.2), (2.902059386, 0.174377854))
            Line((2.902059386, 0.174377854), (3, 0))
        make_face()
    extrude(amount=6.35)
    with BuildSketch(Plane(origin=(-39.182202952, 472.322378528, 0), x_dir=(-0.486588082362211, -0.8736315230708346, 0), z_dir=(0, 0, 1)), Plane(origin=(25.040067328, 486.464514152, 0), x_dir=(-0.873631523070838, 0.4865880823622048, 0), z_dir=(0, 0, 1))) as fillet4_piece_2:
        with BuildLine():
            CenterArc((6.224742227, -9.981721717), FILLET4_R, 93.464746761, 41.330757835)
            Line((-0.821043125, -2.885461521), (-0.961958832, -2.743536317))
            ThreePointArc((-0.961958832, -2.743536317), (-0.602885664, -1.387994552), (-0.192364101, 0.054736208))
            Line((-0.192364101, 0.054736208), (0.012086878, 0.199634434))
            ThreePointArc((0.012086878, 0.199634434), (2.810199161, 0.115005986), (5.608311443, 0.199634434))
            Line((5.608311443, 0.199634434), (5.620398321, 0))
        make_face()
    extrude(amount=6.35)


solid = cut_extrude7_piece_1_1.part
